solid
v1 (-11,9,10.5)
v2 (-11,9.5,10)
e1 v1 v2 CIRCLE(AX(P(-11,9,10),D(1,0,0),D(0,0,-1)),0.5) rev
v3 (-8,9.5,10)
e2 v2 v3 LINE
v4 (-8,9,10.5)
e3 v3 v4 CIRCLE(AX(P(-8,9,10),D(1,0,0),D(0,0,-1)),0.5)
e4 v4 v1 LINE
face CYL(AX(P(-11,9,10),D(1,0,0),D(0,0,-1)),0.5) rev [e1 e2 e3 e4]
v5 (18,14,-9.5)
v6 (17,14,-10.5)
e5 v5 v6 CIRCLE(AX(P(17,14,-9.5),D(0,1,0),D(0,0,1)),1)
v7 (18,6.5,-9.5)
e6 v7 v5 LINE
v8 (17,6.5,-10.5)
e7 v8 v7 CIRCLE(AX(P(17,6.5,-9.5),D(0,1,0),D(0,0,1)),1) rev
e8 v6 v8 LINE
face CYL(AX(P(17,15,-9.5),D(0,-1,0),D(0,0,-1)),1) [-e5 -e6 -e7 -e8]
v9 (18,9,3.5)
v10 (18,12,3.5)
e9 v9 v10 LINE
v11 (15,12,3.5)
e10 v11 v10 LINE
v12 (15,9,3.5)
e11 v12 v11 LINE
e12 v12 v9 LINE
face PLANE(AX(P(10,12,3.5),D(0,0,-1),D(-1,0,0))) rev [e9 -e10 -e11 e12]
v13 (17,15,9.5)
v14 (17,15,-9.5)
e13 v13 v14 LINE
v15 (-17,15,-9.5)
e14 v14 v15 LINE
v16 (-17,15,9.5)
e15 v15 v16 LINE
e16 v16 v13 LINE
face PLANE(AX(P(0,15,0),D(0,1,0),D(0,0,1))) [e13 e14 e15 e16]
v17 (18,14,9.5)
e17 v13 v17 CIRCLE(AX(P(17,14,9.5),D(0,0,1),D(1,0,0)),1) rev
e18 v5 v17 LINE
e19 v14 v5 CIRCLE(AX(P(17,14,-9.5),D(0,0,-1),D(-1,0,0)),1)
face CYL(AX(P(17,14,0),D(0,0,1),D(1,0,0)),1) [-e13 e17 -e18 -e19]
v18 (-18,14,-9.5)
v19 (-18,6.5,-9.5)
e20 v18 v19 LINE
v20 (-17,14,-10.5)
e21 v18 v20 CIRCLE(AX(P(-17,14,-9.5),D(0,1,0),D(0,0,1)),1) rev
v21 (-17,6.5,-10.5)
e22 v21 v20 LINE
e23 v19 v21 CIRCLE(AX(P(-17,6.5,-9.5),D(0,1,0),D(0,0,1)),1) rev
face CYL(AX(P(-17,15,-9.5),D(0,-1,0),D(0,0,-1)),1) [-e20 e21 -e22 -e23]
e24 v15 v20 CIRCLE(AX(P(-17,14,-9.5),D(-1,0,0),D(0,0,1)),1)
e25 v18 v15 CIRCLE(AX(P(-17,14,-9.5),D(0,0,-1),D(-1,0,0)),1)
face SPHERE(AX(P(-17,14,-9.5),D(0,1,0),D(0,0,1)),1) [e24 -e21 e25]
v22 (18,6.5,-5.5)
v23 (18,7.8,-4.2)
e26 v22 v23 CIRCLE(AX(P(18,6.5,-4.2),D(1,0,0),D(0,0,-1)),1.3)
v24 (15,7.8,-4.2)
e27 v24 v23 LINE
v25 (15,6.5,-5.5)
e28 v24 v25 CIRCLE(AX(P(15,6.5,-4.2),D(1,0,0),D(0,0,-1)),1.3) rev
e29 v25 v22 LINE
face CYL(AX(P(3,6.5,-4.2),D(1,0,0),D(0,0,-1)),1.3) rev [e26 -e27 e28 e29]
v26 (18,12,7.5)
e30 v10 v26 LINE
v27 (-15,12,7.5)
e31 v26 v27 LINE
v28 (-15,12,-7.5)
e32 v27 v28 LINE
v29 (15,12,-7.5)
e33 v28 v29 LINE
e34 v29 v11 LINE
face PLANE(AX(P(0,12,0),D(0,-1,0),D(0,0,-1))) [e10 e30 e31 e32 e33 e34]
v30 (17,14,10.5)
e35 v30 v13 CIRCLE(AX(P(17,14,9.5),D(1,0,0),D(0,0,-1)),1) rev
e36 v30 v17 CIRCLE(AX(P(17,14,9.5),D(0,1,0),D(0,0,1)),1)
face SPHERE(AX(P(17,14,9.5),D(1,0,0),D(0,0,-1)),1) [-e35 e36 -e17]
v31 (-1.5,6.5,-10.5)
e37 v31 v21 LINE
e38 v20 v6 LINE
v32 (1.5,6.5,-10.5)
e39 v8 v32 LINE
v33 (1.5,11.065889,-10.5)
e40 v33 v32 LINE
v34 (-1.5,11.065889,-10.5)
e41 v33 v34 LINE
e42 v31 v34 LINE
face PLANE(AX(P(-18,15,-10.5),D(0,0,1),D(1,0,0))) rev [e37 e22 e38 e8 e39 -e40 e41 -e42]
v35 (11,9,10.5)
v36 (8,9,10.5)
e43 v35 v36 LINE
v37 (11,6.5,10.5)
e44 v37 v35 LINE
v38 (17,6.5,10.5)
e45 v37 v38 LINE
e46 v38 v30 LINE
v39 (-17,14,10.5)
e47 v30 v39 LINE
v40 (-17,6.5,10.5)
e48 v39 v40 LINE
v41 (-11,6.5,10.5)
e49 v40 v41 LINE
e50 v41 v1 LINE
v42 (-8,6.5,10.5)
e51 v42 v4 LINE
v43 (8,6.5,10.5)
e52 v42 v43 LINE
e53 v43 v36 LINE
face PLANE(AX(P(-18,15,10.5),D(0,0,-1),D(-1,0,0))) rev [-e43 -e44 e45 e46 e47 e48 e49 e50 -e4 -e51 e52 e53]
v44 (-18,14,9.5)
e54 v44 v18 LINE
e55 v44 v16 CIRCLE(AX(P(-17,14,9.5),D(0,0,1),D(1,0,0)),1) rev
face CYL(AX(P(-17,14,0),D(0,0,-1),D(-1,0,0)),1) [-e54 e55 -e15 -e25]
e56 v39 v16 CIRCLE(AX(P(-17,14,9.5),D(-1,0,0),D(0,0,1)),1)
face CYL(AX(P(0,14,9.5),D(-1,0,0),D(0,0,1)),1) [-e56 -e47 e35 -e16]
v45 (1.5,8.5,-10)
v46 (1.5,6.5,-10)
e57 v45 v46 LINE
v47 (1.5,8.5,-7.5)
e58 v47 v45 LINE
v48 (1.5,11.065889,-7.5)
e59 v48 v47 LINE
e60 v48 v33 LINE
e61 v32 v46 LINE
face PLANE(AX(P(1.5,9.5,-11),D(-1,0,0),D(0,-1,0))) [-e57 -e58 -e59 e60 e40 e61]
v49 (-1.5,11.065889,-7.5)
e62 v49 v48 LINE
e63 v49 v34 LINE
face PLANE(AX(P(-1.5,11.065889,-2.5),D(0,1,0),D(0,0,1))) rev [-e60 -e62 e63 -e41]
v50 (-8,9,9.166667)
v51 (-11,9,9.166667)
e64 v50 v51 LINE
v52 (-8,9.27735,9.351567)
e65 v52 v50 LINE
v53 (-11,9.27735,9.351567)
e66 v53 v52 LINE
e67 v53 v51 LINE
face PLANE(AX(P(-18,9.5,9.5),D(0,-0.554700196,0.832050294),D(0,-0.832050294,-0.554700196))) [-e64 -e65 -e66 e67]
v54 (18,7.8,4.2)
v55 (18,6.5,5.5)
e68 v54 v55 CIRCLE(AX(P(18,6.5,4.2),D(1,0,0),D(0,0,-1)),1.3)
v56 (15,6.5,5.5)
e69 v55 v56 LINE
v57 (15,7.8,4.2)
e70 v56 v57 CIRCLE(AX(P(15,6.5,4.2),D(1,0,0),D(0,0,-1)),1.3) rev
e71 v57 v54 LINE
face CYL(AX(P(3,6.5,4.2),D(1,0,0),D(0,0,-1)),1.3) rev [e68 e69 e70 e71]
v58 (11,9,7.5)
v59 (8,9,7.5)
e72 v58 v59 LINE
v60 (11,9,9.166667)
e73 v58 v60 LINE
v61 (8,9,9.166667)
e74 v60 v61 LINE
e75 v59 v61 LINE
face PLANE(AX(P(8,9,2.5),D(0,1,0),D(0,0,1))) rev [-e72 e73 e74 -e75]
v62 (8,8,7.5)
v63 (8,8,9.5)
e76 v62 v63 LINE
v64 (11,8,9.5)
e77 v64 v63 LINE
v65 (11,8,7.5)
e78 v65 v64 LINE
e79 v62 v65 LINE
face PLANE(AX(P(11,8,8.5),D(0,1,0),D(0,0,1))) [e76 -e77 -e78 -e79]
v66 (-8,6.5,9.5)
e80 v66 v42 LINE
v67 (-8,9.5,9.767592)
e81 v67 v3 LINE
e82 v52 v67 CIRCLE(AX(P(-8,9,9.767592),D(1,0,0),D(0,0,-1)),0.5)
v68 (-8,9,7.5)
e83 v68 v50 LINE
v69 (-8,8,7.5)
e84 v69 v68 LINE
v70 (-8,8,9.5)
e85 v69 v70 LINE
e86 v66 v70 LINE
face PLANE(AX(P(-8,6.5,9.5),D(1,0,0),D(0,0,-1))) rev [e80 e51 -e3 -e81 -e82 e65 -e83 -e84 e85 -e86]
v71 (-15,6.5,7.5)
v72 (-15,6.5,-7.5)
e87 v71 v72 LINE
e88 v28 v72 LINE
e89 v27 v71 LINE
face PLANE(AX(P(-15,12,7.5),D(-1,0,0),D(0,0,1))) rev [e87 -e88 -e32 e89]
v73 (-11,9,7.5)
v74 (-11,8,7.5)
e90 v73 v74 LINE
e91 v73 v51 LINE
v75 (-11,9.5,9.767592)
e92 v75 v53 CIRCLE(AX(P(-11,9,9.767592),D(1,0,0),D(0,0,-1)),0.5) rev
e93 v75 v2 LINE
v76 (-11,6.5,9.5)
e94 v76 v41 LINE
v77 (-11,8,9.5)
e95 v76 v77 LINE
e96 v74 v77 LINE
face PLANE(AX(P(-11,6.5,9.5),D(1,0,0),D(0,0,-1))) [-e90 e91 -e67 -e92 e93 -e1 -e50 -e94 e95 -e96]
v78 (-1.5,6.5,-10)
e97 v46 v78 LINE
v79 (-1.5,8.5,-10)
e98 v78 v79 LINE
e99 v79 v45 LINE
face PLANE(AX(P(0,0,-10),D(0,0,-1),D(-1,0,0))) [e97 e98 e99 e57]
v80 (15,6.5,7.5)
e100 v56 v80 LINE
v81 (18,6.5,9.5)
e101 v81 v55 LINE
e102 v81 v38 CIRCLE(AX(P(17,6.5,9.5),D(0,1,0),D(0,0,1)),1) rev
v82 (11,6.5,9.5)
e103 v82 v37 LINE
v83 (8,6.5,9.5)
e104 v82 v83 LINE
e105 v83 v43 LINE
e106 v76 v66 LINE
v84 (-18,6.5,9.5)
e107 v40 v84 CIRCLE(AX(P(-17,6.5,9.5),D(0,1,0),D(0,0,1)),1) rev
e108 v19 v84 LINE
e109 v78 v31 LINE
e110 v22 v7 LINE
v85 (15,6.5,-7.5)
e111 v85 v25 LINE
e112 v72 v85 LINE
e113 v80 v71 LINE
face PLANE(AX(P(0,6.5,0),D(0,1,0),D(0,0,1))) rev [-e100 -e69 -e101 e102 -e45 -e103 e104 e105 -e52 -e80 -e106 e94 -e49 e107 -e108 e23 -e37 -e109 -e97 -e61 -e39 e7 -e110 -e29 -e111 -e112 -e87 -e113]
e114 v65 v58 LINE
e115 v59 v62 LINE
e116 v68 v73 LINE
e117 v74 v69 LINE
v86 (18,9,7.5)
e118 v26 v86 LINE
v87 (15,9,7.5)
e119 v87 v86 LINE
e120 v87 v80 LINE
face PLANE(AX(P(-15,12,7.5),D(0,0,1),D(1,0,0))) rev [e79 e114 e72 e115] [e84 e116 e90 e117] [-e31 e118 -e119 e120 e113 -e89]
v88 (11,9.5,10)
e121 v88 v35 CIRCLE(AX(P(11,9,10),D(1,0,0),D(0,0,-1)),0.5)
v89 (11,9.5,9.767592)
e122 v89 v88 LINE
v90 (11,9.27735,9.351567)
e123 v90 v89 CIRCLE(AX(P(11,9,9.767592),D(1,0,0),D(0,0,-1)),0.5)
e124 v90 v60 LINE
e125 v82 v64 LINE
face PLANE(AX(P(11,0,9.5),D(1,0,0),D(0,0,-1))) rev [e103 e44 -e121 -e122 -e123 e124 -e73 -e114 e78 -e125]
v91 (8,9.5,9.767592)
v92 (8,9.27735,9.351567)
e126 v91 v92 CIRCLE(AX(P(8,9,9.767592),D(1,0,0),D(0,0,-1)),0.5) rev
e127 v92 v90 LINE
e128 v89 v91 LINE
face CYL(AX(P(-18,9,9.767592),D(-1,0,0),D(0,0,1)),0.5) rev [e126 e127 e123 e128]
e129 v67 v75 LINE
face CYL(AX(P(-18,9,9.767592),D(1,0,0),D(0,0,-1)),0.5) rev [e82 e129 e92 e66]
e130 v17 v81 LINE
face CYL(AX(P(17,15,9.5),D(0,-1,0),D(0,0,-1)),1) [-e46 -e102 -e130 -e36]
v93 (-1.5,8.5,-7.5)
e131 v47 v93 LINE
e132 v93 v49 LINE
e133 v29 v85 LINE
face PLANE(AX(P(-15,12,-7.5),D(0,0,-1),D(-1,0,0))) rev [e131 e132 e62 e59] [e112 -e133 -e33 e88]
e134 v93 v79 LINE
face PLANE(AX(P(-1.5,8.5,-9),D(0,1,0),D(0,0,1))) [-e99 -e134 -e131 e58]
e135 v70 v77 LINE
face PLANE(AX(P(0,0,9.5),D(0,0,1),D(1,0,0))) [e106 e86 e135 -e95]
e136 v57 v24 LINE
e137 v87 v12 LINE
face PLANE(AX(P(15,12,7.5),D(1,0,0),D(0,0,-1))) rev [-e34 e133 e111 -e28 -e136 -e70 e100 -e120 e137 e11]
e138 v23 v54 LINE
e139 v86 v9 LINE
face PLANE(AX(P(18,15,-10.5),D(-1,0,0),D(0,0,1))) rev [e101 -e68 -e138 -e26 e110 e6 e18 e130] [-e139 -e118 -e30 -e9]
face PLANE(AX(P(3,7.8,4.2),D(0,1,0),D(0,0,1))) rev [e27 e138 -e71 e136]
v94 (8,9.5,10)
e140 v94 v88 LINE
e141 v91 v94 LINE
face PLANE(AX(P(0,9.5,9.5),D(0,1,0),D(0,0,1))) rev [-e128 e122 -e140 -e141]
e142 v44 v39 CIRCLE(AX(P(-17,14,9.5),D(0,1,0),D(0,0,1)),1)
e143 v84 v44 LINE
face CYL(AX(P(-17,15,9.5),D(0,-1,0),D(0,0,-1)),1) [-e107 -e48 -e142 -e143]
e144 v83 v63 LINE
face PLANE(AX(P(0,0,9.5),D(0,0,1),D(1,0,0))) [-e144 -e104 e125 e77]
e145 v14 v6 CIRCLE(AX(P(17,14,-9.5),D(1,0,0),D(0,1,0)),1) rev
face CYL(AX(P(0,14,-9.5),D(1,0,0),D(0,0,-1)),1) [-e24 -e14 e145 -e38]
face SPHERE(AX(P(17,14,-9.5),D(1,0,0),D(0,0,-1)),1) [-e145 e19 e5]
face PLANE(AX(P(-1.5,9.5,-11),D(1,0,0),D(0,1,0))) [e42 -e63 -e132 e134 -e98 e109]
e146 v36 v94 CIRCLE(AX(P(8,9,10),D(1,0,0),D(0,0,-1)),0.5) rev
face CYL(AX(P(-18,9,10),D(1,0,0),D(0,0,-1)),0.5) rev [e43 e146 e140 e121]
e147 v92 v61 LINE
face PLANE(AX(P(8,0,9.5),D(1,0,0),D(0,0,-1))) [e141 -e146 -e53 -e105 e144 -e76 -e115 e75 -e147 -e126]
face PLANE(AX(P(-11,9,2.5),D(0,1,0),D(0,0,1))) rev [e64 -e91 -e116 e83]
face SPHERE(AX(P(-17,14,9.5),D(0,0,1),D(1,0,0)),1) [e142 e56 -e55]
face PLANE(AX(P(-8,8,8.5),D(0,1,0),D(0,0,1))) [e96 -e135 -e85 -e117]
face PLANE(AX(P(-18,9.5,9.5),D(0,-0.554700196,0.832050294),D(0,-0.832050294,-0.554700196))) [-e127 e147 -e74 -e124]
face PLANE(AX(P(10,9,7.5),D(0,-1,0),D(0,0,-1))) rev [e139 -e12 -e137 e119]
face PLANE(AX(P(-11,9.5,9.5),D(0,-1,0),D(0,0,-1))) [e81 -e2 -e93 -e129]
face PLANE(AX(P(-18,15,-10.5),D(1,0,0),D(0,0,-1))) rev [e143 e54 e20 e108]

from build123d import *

# Parameters (mm, degrees)
SKETCH1_W           = 36
SKETCH1_H           = 21
BOSS_EXTRUDE2_DEPTH = 15
CUT_EXTRUDE1_DEPTH  = 15
SKETCH5_W           = 30
SKETCH5_H           = 15
CUT_EXTRUDE2_DEPTH  = 3.5
SKETCH7_W           = 30
SKETCH7_H           = 15
CUT_EXTRUDE3_DEPTH  = 5.5
FILLET1_R           = 1
FILLET2_R           = 1
SKETCH9_W           = 3
SKETCH9_H           = 3
BOSS_EXTRUDE3_DEPTH = 1
SKETCH9_4_W         = 3
SKETCH9_4_H         = 3
BOSS_EXTRUDE4_DEPTH = 1
SKETCH10_W          = 3
SKETCH10_H          = 1.5
BOSS_EXTRUDE5_DEPTH = 1
CUT_EXTRUDE4_DEPTH  = 35.296501279
SKETCH12_W          = 3
SKETCH12_H          = 6
BOSS_EXTRUDE6_DEPTH = 0.5
FILLET3_R           = 11
FILLET4_R           = 0.5
SKETCH17_W          = 3
SKETCH17_H          = 2
BOSS_EXTRUDE7_DEPTH = 1
SKETCH18_W          = 3
SKETCH18_H          = 1.5
BOSS_EXTRUDE8_DEPTH = 1
FILLET5_R           = 0.75
FILLET6_START       = -1.5
FILLET6_DEPTH       = 3
SKETCH19_W          = 3
SKETCH19_H          = 1
CUT_EXTRUDE5_DEPTH  = 8
SKETCH20_W          = 3
SKETCH20_H          = 2.565888667
CUT_EXTRUDE6_DEPTH  = 8
SKETCH21_W          = 4
SKETCH21_H          = 3
CUT_EXTRUDE7_DEPTH  = 8


with BuildPart() as part:
    # Sketch1 → Boss-Extrude2 (new body)
    with BuildSketch(Plane(origin=(0, 0, 0), x_dir=(1, 0, 0), z_dir=(0, 1, 0))):
        Rectangle(SKETCH1_W, SKETCH1_H)
    extrude(amount=BOSS_EXTRUDE2_DEPTH)

    # Sketch2 → Cut-Extrude1 (cut)
    with BuildSketch(Plane(origin=(18, 0, 0), x_dir=(0, 0, -1), z_dir=(1, 0, 0))):
        with BuildLine():
            Line((-4.2, 7.8), (4.2, 7.8))
            ThreePointArc((4.2, 7.8), (5.5, 6.5), (4.2, 5.2))
            Line((4.2, 5.2), (-4.2, 5.2))
            ThreePointArc((-4.2, 5.2), (-5.5, 6.5), (-4.2, 7.8))
        make_face()
    extrude(amount=-CUT_EXTRUDE1_DEPTH, mode=Mode.SUBTRACT)


with BuildPart() as body_2:
    # Split1: the piece on the far side of the plane
    add(part.part)
    split(bisect_by=Plane.ZX.offset(6.5), keep=Keep.BOTTOM)

    # Sketch5 → Cut-Extrude2 (cut)
    with BuildSketch(Plane(origin=(0, 6.5, 0), x_dir=(1, 0, 0), z_dir=(0, 1, 0))):
        Rectangle(SKETCH5_W, SKETCH5_H)
    extrude(amount=-CUT_EXTRUDE2_DEPTH, mode=Mode.SUBTRACT)

    # Fillet2
    fillet2_edges = [body_2.edges().sort_by_distance(p)[0] for p in [
        (18, 0, 0),
        (0, 0, -10.5),
        (-18, 0, 0),
        (0, 0, 10.5),
        (18, 3.25, 10.5),
        (-18, 3.25, 10.5),
        (-18, 3.25, -10.5),
        (18, 3.25, -10.5),
    ]]
    fillet(fillet2_edges, radius=FILLET2_R)

    # Sketch9 → Boss-Extrude3 (add)
    with BuildSketch(Plane.XY.offset(10.5)):
        with Locations((-9.5, 8)):
            Rectangle(SKETCH9_W, SKETCH9_H)
    extrude(amount=-BOSS_EXTRUDE3_DEPTH)

    # Sketch9<4> → Boss-Extrude4 (add)
    with BuildSketch(Plane.XY.offset(10.5)):
        with Locations((9.5, 8)):
            Rectangle(SKETCH9_4_W, SKETCH9_4_H)
    extrude(amount=-BOSS_EXTRUDE4_DEPTH)

    # Sketch10 → Boss-Extrude5 (add)
    with BuildSketch(Plane(origin=(0, 0, 9.5), x_dir=(-1, 0, 0), z_dir=(0, 0, -1))):
        with Locations((-9.5, 8.75)):
            Rectangle(SKETCH10_W, SKETCH10_H)
        with Locations((9.5, 8.75)):
            Rectangle(SKETCH10_W, SKETCH10_H)
    extrude(amount=BOSS_EXTRUDE5_DEPTH)

    # Sketch11 → Cut-Extrude4 (cut, through all)
    with BuildSketch(Plane(origin=(11, 0, 0), x_dir=(0, 0, -1), z_dir=(1, 0, 0))):
        Polygon((-9.5, 9.5), (-8.5, 8), (-8.5, 9.5), align=None)
    extrude(amount=-CUT_EXTRUDE4_DEPTH, mode=Mode.SUBTRACT)

    # Sketch12 → Boss-Extrude6 (add, symmetric)
    with BuildSketch(Plane(origin=(0, 0, -10.5), x_dir=(-1, 0, 0), z_dir=(0, 0, -1))):
        with Locations((0, 6.5)):
            Rectangle(SKETCH12_W, SKETCH12_H)
    extrude(amount=BOSS_EXTRUDE6_DEPTH, both=True)

    # Fillet3
    # the kernel refuses this fillet: 11 mm, written as the material it takes off along each edge
    with BuildSketch(Plane(origin=(-9.696798155, 3.5, -11), x_dir=(0, 0, 1), z_dir=(1, 0, 0))) as fillet3_piece_1:
        with BuildLine():
            CenterArc((11, -3.278719262), FILLET3_R, 162.658557197, 17.341442803)
            Line((0, -3.278719262), (-0.22, -3.278719262))
            Line((-0.22, -3.278719262), (-0.22, 0))
            Line((-0.22, 0), (0, 0.22))
            ThreePointArc((0, 0.22), (0.25, 0.22), (0.29, 0.065574385))
            Line((0.29, 0.065574385), (0.5, 0))
        make_face()
    extrude(amount=19.393596311, mode=Mode.SUBTRACT)

    # Fillet4
    fillet4_edges = [body_2.edges().sort_by_distance(p)[0] for p in [
        (-9.5, 9.5, 9.5),
        (9.5, 9.5, 9.5),
        (-9.5, 9.5, 10.5),
        (9.5, 9.5, 10.5),
    ]]
    fillet(fillet4_edges, radius=FILLET4_R)

    # Sketch17 → Boss-Extrude7 (add)
    with BuildSketch(Plane.XY.offset(-10)):
        with Locations((0, 10.5)):
            Rectangle(SKETCH17_W, SKETCH17_H)
    extrude(amount=-BOSS_EXTRUDE7_DEPTH)

    # Sketch18 → Boss-Extrude8 (add)
    with BuildSketch(Plane.XY.offset(-10)):
        with Locations((0, 9.25)):
            Rectangle(SKETCH18_W, SKETCH18_H)
    extrude(amount=BOSS_EXTRUDE8_DEPTH)

    # Fillet5
    fillet5_edges = [body_2.edges().sort_by_distance(p)[0] for p in [
        (0, 8.5, -9),
        (0, 10, -9),
    ]]
    fillet(fillet5_edges, radius=FILLET5_R - 0.0001)  # a hair under: the kernel refuses the full size

    # Fillet6: read off the stored shape, not the designer's step
    # Fillet6 outline → Fillet6 (cut)
    with BuildSketch(Plane.YZ.offset(FILLET6_START)):
        with BuildLine():
            add(Edge.make_bspline(
                [(11.5, -11), (11.5, -10), (10.5, -10)],
                knots=[0, 0, 0, 1, 1, 1], degree=2, weights=[1, 0.070710678, 1]))
            Line((11.5, -11), (11.5, -10))
            Line((11.5, -10), (10.5, -10))
        make_face()
    extrude(amount=FILLET6_DEPTH, mode=Mode.SUBTRACT)


with BuildPart() as part_1:
    add(part.part)

    # Split1
    split(bisect_by=Plane.ZX.offset(6.5), keep=Keep.TOP)

    # Sketch7 → Cut-Extrude3 (cut)
    with BuildSketch(Plane.XZ.offset(-6.5)):
        Rectangle(SKETCH7_W, SKETCH7_H)
    extrude(amount=-CUT_EXTRUDE3_DEPTH, mode=Mode.SUBTRACT)

    # Fillet1
    fillet1_edges = [part_1.edges().sort_by_distance(p)[0] for p in [
        (-18, 15, 0),
        (0, 15, 10.5),
        (18, 15, 0),
        (18, 10.75, 10.5),
        (-18, 10.75, 10.5),
        (-18, 10.75, -10.5),
        (18, 10.75, -10.5),
        (0, 15, -10.5),
    ]]
    fillet(fillet1_edges, radius=FILLET1_R)

    # Combine1: cut body 2
    add(body_2.part, mode=Mode.SUBTRACT)

    # Sketch19 → Cut-Extrude5 (cut)
    with BuildSketch(Plane.XY.offset(10.5)):
        with Locations((9.5, 8.5)):
            Rectangle(SKETCH19_W, SKETCH19_H)
        with Locations((-9.5, 8.5)):
            Rectangle(SKETCH19_W, SKETCH19_H)
    extrude(amount=-CUT_EXTRUDE5_DEPTH, mode=Mode.SUBTRACT)

    # Sketch20 → Cut-Extrude6 (cut)
    with BuildSketch(Plane(origin=(0, 0, -10.5), x_dir=(-1, 0, 0), z_dir=(0, 0, -1))):
        with Locations((0, 9.782944334)):
            Rectangle(SKETCH20_W, SKETCH20_H)
    extrude(amount=-CUT_EXTRUDE6_DEPTH, mode=Mode.SUBTRACT)

    # Sketch21 → Cut-Extrude7 (cut)
    with BuildSketch(Plane(origin=(18, 0, 0), x_dir=(0, 0, -1), z_dir=(1, 0, 0))):
        with Locations((-5.5, 10.5)):
            Rectangle(SKETCH21_W, SKETCH21_H)
    extrude(amount=-CUT_EXTRUDE7_DEPTH, mode=Mode.SUBTRACT)


solid = part_1.part
